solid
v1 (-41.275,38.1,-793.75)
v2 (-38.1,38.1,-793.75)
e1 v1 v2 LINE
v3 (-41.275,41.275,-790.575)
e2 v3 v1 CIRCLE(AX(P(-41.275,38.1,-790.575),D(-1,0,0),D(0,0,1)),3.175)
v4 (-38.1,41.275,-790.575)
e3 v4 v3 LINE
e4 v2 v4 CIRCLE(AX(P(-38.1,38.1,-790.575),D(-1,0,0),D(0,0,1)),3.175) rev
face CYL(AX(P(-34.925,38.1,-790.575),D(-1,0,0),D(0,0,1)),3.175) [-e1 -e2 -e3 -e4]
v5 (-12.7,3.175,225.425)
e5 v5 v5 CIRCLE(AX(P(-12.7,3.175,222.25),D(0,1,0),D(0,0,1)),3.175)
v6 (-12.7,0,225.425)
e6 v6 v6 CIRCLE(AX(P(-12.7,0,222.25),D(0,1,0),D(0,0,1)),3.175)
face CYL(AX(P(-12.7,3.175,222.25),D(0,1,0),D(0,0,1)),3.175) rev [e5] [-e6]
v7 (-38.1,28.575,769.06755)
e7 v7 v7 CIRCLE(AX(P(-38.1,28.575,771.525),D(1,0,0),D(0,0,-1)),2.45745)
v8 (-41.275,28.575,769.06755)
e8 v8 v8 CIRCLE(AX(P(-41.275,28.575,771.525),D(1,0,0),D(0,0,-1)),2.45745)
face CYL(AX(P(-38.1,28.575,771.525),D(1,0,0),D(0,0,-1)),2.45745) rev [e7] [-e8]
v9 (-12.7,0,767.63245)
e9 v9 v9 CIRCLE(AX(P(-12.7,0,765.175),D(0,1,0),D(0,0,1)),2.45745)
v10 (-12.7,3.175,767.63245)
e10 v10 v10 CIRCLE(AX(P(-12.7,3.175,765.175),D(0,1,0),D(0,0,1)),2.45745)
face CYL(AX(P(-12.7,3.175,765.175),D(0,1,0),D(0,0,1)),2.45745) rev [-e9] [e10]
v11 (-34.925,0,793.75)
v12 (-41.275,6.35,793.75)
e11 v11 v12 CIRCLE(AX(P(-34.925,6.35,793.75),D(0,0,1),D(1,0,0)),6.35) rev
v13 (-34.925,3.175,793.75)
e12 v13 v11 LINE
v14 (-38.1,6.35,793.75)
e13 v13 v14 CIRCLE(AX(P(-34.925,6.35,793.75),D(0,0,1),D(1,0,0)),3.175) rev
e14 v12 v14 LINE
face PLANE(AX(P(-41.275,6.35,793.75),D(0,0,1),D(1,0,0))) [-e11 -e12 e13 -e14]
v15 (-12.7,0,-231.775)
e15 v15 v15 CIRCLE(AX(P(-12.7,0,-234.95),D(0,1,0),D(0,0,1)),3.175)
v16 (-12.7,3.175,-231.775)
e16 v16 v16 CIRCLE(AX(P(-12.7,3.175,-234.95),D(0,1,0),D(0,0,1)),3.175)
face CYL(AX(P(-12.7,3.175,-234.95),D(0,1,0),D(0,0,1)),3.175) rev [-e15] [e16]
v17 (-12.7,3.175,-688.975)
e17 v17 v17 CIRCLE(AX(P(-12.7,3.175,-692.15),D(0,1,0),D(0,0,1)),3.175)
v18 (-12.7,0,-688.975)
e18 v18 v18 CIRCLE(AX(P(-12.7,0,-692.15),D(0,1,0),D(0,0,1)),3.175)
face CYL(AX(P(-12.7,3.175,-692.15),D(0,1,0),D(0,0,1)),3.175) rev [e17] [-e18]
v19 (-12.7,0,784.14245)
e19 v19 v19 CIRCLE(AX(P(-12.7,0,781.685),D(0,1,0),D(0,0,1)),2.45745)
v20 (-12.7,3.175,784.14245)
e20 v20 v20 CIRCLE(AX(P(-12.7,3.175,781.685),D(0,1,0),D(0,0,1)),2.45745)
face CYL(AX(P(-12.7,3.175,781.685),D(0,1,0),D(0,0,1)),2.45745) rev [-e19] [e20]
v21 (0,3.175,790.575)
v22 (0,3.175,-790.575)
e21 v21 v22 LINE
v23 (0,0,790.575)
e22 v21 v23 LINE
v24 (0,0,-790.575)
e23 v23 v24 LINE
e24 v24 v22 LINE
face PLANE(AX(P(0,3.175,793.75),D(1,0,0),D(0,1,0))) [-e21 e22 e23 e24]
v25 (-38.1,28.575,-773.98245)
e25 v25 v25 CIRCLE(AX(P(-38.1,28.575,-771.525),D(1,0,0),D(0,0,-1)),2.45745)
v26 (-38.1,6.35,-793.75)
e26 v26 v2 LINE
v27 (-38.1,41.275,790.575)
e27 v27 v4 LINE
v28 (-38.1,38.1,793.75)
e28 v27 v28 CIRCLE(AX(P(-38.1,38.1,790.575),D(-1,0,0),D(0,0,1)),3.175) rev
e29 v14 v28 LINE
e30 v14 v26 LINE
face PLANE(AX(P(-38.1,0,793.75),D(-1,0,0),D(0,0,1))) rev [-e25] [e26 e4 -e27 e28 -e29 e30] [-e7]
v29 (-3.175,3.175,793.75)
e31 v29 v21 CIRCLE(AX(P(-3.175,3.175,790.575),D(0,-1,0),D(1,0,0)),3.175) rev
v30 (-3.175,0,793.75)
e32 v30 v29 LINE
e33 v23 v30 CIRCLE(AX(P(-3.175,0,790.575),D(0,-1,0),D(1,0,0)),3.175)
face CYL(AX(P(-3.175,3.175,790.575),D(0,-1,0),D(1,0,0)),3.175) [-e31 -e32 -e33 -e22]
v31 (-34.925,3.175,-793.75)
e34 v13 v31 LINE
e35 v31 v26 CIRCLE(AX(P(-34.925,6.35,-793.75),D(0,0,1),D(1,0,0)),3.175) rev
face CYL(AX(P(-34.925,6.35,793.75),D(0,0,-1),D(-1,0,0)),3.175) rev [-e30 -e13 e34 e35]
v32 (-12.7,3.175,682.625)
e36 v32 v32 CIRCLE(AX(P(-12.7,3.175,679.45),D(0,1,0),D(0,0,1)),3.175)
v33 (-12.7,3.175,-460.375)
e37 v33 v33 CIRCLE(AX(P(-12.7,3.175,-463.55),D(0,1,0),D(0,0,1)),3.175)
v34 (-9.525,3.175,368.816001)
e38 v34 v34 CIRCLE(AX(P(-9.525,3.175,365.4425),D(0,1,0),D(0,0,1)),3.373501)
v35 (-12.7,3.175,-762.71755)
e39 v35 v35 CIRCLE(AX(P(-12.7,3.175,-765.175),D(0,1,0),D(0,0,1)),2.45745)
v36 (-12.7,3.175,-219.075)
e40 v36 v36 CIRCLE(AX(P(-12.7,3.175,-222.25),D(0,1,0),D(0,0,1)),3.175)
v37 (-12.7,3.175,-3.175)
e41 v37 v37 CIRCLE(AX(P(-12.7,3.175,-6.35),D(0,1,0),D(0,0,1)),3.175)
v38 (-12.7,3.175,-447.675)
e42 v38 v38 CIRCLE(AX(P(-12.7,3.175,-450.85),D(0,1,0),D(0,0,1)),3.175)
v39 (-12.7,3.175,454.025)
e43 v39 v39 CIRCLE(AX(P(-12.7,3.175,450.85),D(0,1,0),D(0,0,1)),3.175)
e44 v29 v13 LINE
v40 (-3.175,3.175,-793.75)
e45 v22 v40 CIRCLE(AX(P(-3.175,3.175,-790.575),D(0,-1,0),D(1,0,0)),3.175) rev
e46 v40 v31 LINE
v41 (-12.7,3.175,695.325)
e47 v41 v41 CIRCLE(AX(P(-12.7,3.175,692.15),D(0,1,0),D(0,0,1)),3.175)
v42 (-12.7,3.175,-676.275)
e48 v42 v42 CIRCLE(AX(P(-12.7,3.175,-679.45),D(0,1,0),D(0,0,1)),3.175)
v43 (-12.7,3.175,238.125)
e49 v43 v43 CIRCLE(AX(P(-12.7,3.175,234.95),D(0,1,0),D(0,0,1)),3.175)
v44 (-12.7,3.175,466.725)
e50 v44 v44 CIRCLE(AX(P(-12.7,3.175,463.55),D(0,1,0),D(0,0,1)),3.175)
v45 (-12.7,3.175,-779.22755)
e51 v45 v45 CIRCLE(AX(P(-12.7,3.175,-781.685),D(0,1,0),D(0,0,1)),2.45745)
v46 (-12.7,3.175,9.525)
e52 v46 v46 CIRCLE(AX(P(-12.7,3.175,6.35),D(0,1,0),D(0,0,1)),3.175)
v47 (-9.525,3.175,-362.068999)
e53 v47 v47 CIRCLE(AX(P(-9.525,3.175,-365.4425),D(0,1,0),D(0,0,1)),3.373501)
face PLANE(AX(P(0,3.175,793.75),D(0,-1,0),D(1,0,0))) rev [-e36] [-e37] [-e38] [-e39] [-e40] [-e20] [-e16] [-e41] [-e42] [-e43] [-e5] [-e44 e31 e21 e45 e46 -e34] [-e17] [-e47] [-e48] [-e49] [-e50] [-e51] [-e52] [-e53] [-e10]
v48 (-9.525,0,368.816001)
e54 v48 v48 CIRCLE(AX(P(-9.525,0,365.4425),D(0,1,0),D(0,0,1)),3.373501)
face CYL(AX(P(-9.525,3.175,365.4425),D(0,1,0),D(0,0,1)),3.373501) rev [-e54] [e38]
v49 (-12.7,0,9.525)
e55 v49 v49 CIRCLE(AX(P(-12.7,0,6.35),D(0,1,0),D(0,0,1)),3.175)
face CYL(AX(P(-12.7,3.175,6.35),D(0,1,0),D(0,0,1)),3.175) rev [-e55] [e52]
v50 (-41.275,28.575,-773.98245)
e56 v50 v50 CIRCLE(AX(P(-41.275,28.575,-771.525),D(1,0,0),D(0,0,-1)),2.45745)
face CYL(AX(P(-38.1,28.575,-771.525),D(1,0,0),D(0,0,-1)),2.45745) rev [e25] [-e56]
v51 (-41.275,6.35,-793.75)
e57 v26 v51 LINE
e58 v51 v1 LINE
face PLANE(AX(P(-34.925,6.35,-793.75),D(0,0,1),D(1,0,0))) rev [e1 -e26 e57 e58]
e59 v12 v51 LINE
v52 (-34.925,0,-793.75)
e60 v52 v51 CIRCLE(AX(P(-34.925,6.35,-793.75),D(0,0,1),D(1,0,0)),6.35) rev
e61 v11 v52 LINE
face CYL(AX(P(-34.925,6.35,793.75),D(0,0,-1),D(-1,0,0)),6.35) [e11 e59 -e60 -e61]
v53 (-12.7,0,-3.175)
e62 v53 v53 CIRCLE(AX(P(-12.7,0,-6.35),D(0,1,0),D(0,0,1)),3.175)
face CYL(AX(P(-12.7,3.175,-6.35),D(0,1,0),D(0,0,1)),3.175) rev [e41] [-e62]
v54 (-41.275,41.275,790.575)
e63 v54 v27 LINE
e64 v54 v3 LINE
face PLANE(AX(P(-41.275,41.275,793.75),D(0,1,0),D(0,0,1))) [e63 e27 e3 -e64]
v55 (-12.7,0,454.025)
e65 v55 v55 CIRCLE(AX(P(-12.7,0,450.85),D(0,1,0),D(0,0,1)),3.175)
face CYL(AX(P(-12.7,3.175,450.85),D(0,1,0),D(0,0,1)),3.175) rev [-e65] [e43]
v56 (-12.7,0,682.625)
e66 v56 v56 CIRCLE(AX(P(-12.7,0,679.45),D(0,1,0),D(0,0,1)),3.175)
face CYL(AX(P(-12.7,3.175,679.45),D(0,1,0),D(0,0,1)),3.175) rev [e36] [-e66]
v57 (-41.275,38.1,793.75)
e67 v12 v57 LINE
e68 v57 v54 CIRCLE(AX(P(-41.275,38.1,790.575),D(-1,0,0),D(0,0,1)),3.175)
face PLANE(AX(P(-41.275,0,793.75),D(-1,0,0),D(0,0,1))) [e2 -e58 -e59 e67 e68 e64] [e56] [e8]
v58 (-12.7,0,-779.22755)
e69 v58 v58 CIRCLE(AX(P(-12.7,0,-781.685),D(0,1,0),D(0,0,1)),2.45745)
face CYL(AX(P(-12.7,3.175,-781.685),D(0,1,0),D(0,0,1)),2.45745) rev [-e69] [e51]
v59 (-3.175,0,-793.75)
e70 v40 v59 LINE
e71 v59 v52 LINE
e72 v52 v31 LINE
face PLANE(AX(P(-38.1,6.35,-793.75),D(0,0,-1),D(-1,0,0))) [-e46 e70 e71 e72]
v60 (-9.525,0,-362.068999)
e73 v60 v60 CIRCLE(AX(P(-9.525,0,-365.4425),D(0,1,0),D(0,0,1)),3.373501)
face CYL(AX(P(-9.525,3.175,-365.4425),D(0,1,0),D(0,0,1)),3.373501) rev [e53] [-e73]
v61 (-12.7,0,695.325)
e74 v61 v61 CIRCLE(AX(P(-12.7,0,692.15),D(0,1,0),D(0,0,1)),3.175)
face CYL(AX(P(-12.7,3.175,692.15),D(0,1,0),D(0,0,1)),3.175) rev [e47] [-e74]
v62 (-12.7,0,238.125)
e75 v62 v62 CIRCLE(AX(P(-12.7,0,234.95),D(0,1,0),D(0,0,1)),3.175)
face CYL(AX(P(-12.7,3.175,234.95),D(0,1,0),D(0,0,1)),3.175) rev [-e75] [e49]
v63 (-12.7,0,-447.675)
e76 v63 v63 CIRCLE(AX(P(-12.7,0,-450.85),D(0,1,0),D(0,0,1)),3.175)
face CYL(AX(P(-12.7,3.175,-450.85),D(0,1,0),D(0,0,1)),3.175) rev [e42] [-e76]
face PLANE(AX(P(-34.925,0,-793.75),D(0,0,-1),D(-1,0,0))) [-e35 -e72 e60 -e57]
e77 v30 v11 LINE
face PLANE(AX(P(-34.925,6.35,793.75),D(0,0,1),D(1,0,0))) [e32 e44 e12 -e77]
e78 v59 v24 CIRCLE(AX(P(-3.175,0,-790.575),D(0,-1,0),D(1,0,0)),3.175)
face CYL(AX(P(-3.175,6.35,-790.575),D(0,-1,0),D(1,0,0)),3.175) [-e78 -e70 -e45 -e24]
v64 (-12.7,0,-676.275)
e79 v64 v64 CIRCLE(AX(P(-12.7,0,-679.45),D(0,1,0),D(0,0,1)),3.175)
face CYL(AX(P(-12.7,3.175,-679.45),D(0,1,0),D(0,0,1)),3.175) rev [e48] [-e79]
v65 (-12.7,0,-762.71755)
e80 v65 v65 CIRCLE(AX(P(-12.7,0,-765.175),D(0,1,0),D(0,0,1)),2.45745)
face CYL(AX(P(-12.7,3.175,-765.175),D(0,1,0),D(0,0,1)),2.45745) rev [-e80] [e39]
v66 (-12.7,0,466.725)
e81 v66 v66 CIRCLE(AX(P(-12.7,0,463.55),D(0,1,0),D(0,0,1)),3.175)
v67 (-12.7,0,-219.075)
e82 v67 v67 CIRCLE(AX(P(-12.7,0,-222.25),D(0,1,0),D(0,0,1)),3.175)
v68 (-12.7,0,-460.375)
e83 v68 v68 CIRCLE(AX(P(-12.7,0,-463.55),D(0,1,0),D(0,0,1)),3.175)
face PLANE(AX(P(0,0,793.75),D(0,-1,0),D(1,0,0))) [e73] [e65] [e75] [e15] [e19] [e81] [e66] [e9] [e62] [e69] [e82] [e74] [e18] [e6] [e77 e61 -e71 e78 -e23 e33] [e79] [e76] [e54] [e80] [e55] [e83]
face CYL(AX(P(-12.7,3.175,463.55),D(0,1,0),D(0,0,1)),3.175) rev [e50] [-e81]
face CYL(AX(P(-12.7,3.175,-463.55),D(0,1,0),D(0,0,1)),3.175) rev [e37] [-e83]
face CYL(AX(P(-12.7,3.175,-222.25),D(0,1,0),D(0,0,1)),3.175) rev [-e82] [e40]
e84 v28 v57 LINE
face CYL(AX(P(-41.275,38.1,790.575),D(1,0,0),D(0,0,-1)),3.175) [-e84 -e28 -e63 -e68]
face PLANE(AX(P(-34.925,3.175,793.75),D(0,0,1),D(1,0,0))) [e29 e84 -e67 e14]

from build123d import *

# Parameters (mm, degrees)
BASE_FLANGE1_DEPTH               = 793.75
E_0_25_DIAMETER_HOLE1_D          = 6.35
F_10_0_1935_DIAMETER_HOLE1_D     = 4.9149
FILLET1_R                        = 3.175
F_17_64_0_26563_DIAMETER_HOLE2_D = 6.747002
F_10_0_1935_DIAMETER_HOLE2_D     = 4.9149


# Sheet-metal steps are written as plain solids
with BuildPart() as part:
    # Sketch1 → Base-Flange1 (new, symmetric)
    with BuildSketch(Plane.XY):
        with BuildLine():
            Line((0, 0), (-34.925, 0))
            ThreePointArc((-34.925, 0), (-39.415128061, 1.859871939), (-41.275, 6.35))
            Line((-41.275, 6.35), (-41.275, 41.275))
            Line((-41.275, 41.275), (-38.1, 41.275))
            Line((-38.1, 41.275), (-38.1, 6.35))
            ThreePointArc((-38.1, 6.35), (-37.17006403, 4.10493597), (-34.925, 3.175))
            Line((-34.925, 3.175), (0, 3.175))
            Line((0, 3.175), (0, 0))
        make_face()
    extrude(amount=BASE_FLANGE1_DEPTH, both=True)

    # E (0.25) Diameter Hole1 (through all)
    with Locations(Plane(origin=(0, 3.175, 0), x_dir=(1, 0, 0), z_dir=(0, 1, 0))):
        with Locations((-12.7, 6.35), (-12.7, -6.35), (-12.7, 234.95), (-12.7, 222.25), (-12.7, 463.55), (-12.7, 450.85), (-12.7, 692.15), (-12.7, 679.45), (-12.7, -222.25), (-12.7, -234.95), (-12.7, -450.85), (-12.7, -463.55), (-12.7, -679.45), (-12.7, -692.15)):
            Hole(E_0_25_DIAMETER_HOLE1_D / 2)

    # #10 (0.1935) Diameter Hole1 (through all)
    with Locations(Plane(origin=(0, 3.175, 0), x_dir=(1, 0, 0), z_dir=(0, 1, 0))):
        with Locations((-12.7, -765.175), (-12.7, -781.685), (-12.7, 781.685), (-12.7, 765.175)):
            Hole(F_10_0_1935_DIAMETER_HOLE1_D / 2)

    # Fillet1
    fillet1_edges = [part.edges().sort_by_distance(p)[0] for p in [
        (0, 1.5875, 793.75),
        (0, 1.5875, -793.75),
        (-39.6875, 41.275, 793.75),
        (-39.6875, 41.275, -793.75),
    ]]
    fillet(fillet1_edges, radius=FILLET1_R)

    # 17/64 (0.26563) Diameter Hole2 (through all)
    with Locations(Plane(origin=(0, 3.175, 0), x_dir=(1, 0, 0), z_dir=(0, 1, 0))):
        with Locations((-9.525, 365.4425), (-9.525, -365.4425)):
            Hole(F_17_64_0_26563_DIAMETER_HOLE2_D / 2)

    # #10 (0.1935) Diameter Hole2 (through all)
    with Locations(Plane(origin=(-38.1, 0, 0), x_dir=(0, 0, -1), z_dir=(1, 0, 0))):
        with Locations((-771.525, 28.575), (771.525, 28.575)):
            Hole(F_10_0_1935_DIAMETER_HOLE2_D / 2)


solid = part.part
